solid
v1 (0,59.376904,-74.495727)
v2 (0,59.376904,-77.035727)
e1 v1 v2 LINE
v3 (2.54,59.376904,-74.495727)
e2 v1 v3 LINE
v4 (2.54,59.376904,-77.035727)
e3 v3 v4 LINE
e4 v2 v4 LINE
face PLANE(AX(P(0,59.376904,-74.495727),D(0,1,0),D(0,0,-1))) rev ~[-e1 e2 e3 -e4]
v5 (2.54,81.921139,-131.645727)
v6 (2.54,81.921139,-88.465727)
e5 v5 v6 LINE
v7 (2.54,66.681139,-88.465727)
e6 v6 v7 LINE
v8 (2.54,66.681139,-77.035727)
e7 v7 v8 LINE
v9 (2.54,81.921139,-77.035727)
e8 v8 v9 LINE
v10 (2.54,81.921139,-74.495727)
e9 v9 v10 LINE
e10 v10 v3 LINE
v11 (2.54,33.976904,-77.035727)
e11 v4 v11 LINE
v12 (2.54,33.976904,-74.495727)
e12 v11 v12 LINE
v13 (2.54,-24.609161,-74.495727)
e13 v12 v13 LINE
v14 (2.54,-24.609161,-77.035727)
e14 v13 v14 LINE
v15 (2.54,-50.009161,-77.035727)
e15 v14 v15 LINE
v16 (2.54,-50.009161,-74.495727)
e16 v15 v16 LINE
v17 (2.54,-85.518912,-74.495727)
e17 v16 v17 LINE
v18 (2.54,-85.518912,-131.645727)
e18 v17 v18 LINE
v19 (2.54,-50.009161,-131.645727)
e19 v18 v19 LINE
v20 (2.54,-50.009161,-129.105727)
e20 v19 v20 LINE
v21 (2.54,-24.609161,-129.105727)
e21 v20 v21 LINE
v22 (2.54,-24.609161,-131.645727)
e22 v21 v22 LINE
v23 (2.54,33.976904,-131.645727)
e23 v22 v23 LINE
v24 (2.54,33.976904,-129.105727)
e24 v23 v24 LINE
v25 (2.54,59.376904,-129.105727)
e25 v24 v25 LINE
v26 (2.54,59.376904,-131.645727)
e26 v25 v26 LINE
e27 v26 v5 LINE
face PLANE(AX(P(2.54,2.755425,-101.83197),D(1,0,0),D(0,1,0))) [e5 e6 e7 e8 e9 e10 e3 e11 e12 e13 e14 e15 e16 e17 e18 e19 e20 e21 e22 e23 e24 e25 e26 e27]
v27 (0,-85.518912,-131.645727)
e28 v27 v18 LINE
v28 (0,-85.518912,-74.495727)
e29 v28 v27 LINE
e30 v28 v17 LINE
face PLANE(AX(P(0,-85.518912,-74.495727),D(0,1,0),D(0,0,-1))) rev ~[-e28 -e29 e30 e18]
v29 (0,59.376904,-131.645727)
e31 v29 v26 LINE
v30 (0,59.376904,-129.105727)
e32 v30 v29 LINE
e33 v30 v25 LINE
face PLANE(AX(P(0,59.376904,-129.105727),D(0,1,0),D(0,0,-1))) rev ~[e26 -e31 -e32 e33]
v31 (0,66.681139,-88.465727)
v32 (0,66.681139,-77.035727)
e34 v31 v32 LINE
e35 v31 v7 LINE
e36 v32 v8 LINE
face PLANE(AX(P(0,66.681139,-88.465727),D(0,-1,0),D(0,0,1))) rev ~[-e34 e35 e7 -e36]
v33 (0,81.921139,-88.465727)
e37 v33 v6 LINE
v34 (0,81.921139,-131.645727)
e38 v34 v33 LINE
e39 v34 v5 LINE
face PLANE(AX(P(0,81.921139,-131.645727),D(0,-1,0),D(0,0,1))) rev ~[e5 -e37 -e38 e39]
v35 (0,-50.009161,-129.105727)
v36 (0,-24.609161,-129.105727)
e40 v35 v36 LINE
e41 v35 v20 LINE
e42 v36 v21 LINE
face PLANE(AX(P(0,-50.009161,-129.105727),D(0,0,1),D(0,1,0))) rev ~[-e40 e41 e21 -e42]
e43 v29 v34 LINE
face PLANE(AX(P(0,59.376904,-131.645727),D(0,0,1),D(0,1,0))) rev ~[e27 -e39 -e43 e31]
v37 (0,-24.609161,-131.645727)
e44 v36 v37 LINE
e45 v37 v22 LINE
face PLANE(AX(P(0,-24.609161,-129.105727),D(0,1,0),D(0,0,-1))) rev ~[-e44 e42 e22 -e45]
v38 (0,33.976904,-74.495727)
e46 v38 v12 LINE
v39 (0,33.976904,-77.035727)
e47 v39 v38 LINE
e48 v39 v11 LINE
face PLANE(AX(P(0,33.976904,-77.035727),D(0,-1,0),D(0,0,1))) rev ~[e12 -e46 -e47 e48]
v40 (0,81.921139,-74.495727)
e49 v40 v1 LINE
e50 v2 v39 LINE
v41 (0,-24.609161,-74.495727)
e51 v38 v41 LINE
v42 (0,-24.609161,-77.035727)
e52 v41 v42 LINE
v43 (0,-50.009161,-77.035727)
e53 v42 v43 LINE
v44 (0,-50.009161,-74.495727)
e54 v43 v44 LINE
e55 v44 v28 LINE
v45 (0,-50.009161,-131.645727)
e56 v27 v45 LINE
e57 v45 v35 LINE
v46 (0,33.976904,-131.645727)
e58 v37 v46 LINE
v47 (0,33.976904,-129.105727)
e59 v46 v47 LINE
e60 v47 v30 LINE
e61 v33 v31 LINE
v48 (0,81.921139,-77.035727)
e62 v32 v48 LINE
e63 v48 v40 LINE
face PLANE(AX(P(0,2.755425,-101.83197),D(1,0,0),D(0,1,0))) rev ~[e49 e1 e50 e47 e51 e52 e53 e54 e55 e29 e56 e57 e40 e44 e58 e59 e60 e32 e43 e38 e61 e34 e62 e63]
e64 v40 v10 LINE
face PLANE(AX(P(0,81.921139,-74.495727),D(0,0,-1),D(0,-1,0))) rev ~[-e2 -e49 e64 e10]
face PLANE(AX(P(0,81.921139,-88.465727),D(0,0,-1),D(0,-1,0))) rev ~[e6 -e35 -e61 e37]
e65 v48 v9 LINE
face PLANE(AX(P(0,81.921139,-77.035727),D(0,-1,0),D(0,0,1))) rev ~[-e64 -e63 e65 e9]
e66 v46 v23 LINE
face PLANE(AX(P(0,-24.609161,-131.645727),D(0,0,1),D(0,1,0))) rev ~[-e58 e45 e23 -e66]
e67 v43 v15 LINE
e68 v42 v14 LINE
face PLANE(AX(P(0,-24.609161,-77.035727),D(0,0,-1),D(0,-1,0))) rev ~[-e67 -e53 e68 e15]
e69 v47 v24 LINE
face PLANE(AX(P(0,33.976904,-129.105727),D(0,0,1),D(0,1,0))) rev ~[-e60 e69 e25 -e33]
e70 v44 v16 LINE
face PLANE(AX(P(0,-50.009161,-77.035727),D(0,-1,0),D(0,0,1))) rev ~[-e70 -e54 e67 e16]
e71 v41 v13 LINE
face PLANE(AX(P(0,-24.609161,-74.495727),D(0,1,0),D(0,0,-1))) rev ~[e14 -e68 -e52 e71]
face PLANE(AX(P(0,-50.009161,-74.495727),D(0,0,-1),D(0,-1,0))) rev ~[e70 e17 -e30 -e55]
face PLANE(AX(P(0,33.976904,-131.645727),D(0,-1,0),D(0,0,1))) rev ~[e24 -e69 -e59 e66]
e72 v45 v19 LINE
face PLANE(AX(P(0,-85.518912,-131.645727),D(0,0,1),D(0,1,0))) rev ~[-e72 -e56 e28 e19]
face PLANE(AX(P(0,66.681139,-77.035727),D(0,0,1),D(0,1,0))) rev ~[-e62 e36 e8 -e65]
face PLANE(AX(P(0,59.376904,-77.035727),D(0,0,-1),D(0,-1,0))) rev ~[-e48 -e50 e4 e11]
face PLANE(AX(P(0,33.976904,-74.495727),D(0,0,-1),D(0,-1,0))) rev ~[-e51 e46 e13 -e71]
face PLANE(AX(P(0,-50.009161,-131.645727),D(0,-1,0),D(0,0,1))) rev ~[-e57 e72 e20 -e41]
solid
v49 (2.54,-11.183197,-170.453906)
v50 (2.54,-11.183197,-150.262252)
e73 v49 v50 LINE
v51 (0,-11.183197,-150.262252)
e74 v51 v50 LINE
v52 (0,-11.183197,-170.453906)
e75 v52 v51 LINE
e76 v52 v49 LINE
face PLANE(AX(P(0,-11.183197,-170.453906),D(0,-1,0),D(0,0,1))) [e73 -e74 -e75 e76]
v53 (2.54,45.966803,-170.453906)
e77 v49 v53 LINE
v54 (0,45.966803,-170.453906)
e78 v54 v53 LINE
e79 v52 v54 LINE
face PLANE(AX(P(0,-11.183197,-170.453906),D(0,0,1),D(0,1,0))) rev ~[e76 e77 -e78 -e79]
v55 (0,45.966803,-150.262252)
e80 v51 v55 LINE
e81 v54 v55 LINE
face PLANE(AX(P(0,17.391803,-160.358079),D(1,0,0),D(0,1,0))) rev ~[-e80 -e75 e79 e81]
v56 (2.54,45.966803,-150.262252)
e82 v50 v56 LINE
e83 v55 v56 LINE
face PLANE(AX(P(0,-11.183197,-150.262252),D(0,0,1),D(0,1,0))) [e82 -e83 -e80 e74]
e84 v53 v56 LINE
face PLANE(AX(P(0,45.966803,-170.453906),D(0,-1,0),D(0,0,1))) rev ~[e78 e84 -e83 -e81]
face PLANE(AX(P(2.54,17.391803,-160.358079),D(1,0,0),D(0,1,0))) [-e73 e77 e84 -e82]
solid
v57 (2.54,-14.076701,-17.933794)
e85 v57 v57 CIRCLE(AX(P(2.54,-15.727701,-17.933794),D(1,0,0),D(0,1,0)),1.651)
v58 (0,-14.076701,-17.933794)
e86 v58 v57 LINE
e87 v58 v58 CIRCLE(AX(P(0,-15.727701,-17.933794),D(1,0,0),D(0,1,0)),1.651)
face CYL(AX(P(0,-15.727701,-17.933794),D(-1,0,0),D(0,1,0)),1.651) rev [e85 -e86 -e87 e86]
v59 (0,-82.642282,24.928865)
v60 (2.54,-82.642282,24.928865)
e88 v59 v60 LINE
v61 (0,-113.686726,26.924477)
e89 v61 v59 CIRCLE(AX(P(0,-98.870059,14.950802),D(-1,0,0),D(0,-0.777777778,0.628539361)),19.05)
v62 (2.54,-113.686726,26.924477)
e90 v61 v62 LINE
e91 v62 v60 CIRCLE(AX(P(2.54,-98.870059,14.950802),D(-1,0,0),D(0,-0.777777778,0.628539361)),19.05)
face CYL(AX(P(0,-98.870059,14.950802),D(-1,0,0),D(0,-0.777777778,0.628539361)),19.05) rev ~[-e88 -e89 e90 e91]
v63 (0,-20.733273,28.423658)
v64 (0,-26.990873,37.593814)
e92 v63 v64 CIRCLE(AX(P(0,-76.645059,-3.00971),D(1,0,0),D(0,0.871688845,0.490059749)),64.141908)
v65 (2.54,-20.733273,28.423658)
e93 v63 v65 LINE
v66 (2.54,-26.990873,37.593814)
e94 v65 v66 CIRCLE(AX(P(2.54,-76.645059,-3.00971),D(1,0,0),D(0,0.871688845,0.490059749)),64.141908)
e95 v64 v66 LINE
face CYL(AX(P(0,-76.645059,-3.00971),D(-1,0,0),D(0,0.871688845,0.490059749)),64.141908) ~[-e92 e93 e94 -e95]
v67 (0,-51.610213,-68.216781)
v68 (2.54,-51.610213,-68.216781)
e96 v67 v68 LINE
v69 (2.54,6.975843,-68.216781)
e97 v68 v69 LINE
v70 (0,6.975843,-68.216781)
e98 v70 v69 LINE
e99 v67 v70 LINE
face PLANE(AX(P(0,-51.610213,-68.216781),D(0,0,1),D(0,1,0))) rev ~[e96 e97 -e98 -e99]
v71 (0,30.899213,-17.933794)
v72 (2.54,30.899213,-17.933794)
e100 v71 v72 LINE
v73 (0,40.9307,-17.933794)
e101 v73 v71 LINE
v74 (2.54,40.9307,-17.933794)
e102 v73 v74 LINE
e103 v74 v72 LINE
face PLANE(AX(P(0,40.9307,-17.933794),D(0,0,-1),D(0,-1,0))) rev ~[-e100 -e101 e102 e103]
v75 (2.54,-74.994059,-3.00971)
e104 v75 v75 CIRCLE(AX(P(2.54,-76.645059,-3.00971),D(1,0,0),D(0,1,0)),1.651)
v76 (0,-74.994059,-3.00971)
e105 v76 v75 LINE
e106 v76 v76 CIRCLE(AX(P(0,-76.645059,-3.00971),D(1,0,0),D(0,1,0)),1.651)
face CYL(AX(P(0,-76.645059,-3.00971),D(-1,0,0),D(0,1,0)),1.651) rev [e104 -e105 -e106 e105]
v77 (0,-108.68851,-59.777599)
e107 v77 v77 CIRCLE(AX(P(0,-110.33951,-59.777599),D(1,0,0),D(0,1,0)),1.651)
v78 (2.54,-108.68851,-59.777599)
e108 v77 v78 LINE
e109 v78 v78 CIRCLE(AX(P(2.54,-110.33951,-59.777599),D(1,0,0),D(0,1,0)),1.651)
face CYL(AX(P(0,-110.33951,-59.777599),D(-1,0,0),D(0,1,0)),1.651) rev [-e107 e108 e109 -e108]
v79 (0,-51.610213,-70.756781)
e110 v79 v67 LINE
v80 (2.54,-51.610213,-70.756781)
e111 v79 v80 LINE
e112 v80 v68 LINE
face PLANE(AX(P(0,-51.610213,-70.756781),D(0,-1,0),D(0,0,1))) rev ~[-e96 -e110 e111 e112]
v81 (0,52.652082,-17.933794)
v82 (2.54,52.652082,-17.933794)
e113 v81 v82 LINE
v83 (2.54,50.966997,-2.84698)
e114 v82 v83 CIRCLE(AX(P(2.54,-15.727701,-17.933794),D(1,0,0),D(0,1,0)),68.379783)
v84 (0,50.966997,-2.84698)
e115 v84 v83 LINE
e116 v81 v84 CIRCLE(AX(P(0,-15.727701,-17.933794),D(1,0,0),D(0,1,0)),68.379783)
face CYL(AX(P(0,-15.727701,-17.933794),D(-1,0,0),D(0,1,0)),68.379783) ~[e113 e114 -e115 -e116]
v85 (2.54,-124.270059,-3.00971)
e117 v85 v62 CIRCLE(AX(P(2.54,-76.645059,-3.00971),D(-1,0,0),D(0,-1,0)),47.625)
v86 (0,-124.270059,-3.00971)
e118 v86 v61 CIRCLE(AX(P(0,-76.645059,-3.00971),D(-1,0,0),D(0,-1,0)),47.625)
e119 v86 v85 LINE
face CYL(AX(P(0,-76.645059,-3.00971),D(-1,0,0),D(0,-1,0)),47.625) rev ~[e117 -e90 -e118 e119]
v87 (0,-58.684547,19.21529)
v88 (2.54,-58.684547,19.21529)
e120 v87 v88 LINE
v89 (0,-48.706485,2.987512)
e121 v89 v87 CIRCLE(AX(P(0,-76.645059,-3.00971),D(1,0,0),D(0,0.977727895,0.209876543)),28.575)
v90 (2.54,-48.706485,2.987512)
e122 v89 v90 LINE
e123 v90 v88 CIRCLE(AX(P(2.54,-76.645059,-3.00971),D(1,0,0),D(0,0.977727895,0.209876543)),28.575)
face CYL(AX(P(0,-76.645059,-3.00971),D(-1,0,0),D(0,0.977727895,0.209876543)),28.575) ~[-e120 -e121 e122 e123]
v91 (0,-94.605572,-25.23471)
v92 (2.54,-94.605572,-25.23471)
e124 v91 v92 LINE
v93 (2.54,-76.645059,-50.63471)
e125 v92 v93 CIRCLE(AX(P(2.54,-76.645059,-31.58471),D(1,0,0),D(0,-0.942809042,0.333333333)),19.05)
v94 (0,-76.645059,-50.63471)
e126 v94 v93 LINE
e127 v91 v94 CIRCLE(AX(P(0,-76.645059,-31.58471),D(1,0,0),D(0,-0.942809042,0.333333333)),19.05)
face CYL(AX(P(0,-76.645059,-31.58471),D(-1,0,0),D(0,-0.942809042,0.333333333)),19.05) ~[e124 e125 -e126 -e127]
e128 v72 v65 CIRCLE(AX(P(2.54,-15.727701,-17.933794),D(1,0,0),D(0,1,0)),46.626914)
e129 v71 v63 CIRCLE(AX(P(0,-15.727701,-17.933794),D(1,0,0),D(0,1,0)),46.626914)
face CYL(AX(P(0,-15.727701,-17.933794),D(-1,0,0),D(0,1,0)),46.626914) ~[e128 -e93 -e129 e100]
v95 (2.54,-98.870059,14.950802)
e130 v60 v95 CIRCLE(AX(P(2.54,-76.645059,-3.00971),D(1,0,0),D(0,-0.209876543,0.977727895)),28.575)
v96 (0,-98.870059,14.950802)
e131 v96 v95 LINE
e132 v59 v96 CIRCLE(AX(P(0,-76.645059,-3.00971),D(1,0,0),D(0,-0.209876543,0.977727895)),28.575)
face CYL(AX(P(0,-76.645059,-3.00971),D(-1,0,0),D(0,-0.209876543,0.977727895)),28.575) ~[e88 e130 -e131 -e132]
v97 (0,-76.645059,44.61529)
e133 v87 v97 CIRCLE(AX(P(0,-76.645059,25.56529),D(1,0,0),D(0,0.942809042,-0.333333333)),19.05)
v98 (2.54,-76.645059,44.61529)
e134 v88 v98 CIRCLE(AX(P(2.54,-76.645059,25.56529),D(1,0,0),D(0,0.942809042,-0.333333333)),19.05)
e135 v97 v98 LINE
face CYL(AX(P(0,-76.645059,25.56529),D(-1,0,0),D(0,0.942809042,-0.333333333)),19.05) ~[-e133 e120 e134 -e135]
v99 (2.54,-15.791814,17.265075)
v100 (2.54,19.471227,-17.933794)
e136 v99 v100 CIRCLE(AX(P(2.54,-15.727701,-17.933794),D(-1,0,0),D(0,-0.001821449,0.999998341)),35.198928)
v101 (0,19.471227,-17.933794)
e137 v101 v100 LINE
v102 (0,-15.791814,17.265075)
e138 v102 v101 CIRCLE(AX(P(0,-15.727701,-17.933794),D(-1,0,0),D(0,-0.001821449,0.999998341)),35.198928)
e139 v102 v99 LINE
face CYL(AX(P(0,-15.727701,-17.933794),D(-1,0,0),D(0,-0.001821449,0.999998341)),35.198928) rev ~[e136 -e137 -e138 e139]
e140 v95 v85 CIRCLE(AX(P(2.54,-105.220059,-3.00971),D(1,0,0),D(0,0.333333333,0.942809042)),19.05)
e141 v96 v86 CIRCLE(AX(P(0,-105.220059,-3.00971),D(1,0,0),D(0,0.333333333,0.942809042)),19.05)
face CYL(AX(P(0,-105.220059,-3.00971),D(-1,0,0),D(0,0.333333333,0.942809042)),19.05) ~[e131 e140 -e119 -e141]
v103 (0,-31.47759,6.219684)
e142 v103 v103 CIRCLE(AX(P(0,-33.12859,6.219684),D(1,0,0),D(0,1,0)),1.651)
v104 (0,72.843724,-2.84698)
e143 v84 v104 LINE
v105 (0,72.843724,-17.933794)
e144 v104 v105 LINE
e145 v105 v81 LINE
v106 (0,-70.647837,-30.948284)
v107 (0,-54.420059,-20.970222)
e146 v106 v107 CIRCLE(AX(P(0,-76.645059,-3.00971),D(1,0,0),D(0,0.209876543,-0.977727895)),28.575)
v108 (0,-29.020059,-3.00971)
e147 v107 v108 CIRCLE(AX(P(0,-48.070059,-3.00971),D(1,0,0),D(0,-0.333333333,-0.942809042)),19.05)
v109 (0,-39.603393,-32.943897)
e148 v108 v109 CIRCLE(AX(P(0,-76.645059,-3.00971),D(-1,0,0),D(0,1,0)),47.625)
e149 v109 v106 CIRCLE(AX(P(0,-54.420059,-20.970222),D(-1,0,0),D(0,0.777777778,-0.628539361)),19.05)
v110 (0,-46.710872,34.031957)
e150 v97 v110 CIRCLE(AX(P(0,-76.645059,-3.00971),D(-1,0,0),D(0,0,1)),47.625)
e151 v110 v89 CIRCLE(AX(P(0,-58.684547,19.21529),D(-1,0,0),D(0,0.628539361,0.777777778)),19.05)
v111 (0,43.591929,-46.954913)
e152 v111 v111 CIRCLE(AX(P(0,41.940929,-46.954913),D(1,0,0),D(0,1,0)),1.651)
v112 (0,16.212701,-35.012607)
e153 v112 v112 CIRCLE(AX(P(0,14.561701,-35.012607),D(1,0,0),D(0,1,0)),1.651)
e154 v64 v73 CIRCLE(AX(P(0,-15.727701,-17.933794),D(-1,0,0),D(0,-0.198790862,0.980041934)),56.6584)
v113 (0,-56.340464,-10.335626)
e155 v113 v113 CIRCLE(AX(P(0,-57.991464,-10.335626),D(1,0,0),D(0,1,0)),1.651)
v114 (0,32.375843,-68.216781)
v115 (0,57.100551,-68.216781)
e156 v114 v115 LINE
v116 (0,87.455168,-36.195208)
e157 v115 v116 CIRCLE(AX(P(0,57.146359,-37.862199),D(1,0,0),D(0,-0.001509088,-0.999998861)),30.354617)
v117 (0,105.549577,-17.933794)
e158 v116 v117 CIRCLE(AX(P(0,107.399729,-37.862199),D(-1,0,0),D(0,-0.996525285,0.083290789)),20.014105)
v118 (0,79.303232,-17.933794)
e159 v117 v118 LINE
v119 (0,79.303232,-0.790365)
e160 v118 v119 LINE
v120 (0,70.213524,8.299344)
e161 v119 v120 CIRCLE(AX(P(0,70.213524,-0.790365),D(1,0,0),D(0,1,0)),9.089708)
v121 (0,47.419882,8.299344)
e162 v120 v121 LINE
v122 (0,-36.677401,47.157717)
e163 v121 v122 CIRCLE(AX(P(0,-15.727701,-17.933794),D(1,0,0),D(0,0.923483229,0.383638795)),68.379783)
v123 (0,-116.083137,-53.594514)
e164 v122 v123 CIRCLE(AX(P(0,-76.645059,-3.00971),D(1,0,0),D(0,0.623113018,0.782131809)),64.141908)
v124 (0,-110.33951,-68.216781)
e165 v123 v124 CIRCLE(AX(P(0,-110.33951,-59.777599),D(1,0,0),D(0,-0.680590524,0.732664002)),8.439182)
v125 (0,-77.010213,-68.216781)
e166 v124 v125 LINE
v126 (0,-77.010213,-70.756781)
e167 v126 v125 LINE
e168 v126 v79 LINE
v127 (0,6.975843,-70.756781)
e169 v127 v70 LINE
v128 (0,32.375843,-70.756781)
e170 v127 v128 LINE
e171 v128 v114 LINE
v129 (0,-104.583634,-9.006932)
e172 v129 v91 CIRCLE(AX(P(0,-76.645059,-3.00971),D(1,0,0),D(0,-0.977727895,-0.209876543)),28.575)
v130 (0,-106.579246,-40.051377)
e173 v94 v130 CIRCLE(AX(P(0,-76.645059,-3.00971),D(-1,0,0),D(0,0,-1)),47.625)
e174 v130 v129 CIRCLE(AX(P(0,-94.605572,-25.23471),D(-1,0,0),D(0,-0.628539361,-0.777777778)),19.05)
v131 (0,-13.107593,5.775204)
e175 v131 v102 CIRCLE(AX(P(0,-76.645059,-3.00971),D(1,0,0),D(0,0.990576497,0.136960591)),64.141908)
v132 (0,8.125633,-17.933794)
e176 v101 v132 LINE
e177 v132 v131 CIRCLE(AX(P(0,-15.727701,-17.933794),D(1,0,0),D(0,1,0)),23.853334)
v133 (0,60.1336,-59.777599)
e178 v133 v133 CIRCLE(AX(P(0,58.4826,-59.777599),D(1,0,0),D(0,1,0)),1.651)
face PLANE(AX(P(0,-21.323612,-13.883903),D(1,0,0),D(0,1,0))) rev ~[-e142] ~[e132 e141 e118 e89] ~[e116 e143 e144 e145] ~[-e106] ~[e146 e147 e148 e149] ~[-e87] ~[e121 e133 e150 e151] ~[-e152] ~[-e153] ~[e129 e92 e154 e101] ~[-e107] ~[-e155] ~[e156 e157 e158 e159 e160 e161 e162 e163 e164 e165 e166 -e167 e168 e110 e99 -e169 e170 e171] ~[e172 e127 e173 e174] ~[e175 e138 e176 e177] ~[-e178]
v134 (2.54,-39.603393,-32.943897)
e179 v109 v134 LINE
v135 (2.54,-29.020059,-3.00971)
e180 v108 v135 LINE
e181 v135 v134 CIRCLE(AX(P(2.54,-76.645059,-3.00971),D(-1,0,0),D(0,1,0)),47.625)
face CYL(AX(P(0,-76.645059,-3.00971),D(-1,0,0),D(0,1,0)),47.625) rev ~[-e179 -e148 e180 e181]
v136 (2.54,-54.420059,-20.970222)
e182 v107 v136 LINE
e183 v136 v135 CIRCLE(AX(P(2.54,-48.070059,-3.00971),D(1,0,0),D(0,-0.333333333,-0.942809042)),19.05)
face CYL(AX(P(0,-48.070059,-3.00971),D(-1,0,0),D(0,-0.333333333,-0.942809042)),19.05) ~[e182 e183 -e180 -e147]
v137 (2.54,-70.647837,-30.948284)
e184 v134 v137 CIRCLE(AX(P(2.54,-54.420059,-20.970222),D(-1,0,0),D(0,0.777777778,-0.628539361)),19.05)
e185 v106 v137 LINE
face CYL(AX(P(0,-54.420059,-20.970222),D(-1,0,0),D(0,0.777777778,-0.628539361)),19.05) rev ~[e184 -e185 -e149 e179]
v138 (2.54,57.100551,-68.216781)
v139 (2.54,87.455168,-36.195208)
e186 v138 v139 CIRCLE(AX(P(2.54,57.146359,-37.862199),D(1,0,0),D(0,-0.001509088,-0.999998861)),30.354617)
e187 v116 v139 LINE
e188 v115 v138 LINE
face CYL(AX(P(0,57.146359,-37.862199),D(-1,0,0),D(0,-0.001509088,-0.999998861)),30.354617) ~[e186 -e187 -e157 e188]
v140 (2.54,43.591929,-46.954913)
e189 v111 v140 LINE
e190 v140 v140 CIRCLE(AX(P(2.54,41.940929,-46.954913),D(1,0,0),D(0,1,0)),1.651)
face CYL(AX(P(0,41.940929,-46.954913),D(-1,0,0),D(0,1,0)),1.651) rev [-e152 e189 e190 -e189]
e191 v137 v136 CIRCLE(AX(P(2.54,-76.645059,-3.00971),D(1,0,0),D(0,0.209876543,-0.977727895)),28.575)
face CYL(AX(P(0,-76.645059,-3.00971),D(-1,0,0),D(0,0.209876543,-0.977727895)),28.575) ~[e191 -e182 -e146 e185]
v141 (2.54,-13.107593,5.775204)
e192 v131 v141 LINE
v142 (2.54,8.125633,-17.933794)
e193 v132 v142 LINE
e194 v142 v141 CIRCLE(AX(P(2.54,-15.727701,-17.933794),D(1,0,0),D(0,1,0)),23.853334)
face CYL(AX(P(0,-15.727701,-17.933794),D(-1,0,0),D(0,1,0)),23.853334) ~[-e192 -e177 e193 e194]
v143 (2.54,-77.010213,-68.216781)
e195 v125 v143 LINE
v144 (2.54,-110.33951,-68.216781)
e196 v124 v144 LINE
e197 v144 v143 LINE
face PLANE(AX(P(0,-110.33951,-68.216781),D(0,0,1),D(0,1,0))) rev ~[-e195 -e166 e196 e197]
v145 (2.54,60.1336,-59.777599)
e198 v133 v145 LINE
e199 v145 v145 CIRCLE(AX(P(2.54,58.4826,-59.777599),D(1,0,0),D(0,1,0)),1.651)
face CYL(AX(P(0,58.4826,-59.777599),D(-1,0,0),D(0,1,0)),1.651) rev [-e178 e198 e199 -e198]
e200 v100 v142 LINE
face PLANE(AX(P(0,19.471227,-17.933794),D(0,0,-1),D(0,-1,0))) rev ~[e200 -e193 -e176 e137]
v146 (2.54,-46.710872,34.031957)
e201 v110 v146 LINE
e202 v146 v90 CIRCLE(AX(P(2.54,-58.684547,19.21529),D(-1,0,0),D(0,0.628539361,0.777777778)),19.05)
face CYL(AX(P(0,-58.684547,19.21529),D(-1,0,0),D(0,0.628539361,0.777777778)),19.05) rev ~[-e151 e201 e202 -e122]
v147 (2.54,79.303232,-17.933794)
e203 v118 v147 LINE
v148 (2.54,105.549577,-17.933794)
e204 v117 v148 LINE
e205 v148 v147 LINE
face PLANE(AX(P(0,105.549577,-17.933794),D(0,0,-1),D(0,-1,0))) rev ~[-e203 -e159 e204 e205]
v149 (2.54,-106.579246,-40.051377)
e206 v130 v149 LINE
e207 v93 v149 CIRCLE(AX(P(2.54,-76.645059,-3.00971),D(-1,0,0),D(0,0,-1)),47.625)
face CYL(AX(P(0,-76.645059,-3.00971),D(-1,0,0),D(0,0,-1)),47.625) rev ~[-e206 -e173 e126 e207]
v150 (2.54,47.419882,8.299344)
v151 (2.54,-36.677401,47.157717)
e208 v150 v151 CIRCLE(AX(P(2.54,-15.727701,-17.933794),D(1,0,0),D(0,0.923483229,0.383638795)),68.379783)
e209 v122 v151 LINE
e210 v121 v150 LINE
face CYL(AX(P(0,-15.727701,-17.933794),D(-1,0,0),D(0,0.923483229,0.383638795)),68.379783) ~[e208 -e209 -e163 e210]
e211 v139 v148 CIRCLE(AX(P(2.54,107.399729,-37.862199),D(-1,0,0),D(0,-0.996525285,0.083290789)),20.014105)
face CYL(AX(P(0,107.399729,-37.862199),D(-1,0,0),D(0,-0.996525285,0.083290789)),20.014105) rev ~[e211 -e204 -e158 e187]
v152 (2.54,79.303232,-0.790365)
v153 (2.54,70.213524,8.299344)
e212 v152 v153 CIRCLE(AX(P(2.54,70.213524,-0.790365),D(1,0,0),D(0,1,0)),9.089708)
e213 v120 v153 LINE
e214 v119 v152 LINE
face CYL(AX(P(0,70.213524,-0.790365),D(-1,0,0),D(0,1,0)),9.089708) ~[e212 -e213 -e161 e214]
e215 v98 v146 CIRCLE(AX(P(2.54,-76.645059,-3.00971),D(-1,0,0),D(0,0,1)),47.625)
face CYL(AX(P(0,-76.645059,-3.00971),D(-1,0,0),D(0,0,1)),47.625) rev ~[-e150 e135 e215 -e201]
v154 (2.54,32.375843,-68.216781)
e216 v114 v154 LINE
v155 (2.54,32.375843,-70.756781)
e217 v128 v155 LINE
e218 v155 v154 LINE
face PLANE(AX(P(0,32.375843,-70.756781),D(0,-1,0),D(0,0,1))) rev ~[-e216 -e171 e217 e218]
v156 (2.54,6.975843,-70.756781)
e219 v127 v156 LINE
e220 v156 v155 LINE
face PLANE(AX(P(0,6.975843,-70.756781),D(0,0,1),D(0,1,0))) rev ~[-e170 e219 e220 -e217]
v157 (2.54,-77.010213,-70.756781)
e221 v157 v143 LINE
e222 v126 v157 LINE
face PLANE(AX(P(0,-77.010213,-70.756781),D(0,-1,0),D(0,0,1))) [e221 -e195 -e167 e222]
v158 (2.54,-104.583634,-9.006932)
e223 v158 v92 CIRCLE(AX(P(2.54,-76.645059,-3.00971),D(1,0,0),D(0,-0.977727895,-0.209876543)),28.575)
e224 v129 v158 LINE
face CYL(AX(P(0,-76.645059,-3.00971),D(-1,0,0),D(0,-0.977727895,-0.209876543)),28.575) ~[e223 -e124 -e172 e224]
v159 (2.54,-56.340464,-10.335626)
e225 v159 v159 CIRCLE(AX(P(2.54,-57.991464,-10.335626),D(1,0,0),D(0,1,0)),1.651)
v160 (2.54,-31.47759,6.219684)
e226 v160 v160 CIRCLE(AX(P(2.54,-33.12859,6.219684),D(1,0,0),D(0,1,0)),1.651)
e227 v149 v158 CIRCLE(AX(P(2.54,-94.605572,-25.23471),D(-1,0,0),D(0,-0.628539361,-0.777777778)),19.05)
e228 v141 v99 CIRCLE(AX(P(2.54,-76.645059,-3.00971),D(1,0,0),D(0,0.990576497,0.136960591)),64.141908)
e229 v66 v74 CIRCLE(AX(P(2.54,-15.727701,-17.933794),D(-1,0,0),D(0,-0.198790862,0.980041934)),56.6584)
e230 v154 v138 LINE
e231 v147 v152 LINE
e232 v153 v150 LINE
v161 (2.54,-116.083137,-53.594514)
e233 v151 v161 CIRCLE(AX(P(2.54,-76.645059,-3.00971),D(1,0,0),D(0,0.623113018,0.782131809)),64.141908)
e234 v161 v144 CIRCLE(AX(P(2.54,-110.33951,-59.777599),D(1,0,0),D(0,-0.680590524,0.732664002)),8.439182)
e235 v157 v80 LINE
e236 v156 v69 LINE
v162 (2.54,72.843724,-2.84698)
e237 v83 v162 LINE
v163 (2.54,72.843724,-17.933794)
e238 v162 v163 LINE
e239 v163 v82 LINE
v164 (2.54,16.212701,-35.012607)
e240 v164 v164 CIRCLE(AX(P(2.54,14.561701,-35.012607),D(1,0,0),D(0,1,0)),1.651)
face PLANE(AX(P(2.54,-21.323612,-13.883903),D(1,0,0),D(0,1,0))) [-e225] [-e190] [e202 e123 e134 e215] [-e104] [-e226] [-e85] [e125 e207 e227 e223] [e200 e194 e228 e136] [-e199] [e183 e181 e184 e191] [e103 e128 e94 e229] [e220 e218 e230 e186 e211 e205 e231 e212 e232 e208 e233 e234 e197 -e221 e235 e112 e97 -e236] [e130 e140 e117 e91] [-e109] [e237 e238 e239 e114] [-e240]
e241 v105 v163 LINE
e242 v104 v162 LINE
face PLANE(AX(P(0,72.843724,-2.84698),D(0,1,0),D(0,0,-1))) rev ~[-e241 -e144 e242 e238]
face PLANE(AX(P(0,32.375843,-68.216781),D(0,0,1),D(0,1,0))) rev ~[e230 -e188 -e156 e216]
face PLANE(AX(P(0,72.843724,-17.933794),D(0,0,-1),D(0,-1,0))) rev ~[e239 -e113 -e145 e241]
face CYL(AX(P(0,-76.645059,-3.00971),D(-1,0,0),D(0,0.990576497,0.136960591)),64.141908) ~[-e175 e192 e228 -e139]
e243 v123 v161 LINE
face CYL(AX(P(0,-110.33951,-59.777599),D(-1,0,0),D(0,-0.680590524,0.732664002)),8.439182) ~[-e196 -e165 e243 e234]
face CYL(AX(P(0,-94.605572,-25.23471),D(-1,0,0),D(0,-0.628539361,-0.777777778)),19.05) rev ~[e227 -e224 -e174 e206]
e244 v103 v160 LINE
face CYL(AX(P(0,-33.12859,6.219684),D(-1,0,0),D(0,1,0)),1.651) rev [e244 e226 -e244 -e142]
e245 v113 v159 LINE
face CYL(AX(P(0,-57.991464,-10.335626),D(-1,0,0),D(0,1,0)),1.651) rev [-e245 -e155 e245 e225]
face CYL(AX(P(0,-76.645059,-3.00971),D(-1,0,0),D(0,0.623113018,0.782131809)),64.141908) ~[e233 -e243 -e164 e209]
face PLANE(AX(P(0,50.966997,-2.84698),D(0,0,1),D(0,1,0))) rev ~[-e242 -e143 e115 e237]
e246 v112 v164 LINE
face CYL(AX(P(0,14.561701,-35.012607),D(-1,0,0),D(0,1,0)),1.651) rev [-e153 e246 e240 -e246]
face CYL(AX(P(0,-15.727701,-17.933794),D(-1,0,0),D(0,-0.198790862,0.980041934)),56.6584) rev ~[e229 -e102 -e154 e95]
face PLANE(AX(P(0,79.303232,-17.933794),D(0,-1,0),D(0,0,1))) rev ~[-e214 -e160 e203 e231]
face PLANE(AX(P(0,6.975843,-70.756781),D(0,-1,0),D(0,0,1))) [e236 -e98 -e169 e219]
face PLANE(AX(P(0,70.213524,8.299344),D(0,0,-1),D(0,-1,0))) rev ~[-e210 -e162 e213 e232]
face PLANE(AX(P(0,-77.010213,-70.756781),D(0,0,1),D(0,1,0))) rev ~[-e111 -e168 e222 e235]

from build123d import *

# Parameters (mm, degrees)
F0_R     = 1.651
F0_W     = 25.4
F0_H     = 2.54
F1_DEPTH = 2.54
F3_DEPTH = 2.54
F2_W     = 57.15
F2_H     = 20.1916538


# Not quite as in the source:
# - a feature names something its author has since deleted; it is built from what else it names


with BuildPart() as f1:
    # F0 (on Right) → F1 (new body)
    with BuildSketch(Plane.YZ):
        with BuildLine():
            Line((-110.3395098078, -68.216781003), (-77.0102134189, -68.216781003))
            Line((-77.0102134189, -68.216781003), (-51.6102134189, -68.216781003))
            Line((-51.6102134189, -68.216781003), (6.9758426398, -68.216781003))
            Line((6.9758426398, -68.216781003), (32.3758426398, -68.216781003))
            Line((32.3758426398, -68.216781003), (57.100551478, -68.216781003))
            ThreePointArc((57.100551478, -68.216781003), (79.1760571871, -58.7450905637), (87.4551682283, -36.1952082478))
            ThreePointArc((87.4551682283, -36.1952082478), (93.1827609105, -23.7752479136), (105.5495773538, -17.933794011))
            Line((105.5495773538, -17.933794011), (79.3032324412, -17.933794011))
            Line((79.3032324412, -17.933794011), (79.3032324412, -0.7903648026))
            ThreePointArc((79.3032324412, -0.7903648026), (76.6409185109, 5.6370295953), (70.2135241129, 8.2993435257))
            Line((70.2135241129, 8.2993435257), (47.4198818769, 8.2993435257))
            ThreePointArc((47.4198818769, 8.2993435257), (12.9543250307, 44.1398405436), (-36.6774012974, 47.1577167678))
            ThreePointArc((-36.6774012974, 47.1577167678), (-127.0218705021, 36.6937065388), (-116.0831372229, -53.5945138457))
            ThreePointArc((-116.0831372229, -53.5945138457), (-118.1944438098, -62.8630173745), (-110.3395098078, -68.216781003))
        make_face()
        with Locations((-110.3395098078, -59.7775988281)):
            Circle(F0_R, mode=Mode.SUBTRACT)
        with BuildLine():
            ThreePointArc((-106.5792463676, -40.0513765479), (-113.6163335987, -24.0126518115), (-104.5836338962, -9.0069321035))
            ThreePointArc((-104.5836338962, -9.0069321035), (-100.986725964, -17.9768034164), (-94.6055715395, -25.2347098813))
            ThreePointArc((-94.6055715395, -25.2347098813), (-92.199319164, -42.5832325093), (-76.6450592973, -50.6347098813))
            ThreePointArc((-76.6450592973, -50.6347098813), (-92.5200592973, -47.9109904866), (-106.5792463676, -40.0513765479))
        make_face(mode=Mode.SUBTRACT)
        with BuildLine():
            ThreePointArc((-70.6478370751, -30.9482844801), (-61.6779657622, -27.3513765479), (-54.4200592973, -20.9702221234))
            ThreePointArc((-54.4200592973, -20.9702221234), (-37.0715366693, -18.5639697479), (-29.0200592973, -3.0097098813))
            ThreePointArc((-29.0200592973, -3.0097098813), (-31.743778692, -18.8847098813), (-39.6033926307, -32.9438969515))
            ThreePointArc((-39.6033926307, -32.9438969515), (-55.6421173671, -39.9809841827), (-70.6478370751, -30.9482844801))
        make_face(mode=Mode.SUBTRACT)
        with Locations((-57.9914643632, -10.3356258236)):
            Circle(F0_R, mode=Mode.SUBTRACT)
        with Locations((41.94092891, -46.9549127524)):
            Circle(F0_R, mode=Mode.SUBTRACT)
        with Locations((58.4825998644, -59.7775988281)):
            Circle(F0_R, mode=Mode.SUBTRACT)
        with Locations((14.561701, -35.0126066428)):
            Circle(F0_R, mode=Mode.SUBTRACT)
        with Locations((-15.7277009394, -17.933794011)):
            Circle(F0_R, mode=Mode.SUBTRACT)
        with BuildLine():
            Line((72.8437239482, -17.933794011), (52.6520820419, -17.933794011))
            ThreePointArc((52.6520820419, -17.933794011), (52.2295051274, -10.343480173), (50.9669973093, -2.8469803618))
            Line((50.9669973093, -2.8469803618), (72.8437239482, -2.8469803618))
            Line((72.8437239482, -2.8469803618), (72.8437239482, -17.933794011))
        make_face(mode=Mode.SUBTRACT)
        with BuildLine():
            ThreePointArc((-124.2700592973, -3.0097098813), (-121.5463399027, 12.8652901187), (-113.686725964, 26.924477189))
            ThreePointArc((-113.686725964, 26.924477189), (-97.6480012275, 33.9615644202), (-82.6422815195, 24.9288647176))
            ThreePointArc((-82.6422815195, 24.9288647176), (-91.6121528324, 21.3319567854), (-98.8700592973, 14.9508023609))
            ThreePointArc((-98.8700592973, 14.9508023609), (-116.2185819254, 12.5445499854), (-124.2700592973, -3.0097098813))
        make_face(mode=Mode.SUBTRACT)
        with Locations((-76.6450592973, -3.0097098813)):
            Circle(F0_R, mode=Mode.SUBTRACT)
        with Locations((-33.1285902436, 6.2196841001)):
            Circle(F0_R, mode=Mode.SUBTRACT)
        with BuildLine():
            ThreePointArc((-46.7108722271, 34.0319567854), (-39.6737849959, 17.993232049), (-48.7064846984, 2.987512341))
            ThreePointArc((-48.7064846984, 2.987512341), (-52.3033926307, 11.9573836539), (-58.6845470552, 19.2152901187))
            ThreePointArc((-58.6845470552, 19.2152901187), (-61.0907994306, 36.5638127468), (-76.6450592973, 44.6152901187))
            ThreePointArc((-76.6450592973, 44.6152901187), (-60.7700592973, 41.8915707241), (-46.7108722271, 34.0319567854))
        make_face(mode=Mode.SUBTRACT)
        with BuildLine():
            ThreePointArc((8.1256330932, -17.933794011), (2.0413714041, -2.0202270784), (-13.1075925996, 5.7752037906))
            ThreePointArc((-13.1075925996, 5.7752037906), (-14.1849392561, 11.581992796), (-15.7918139924, 17.2650754062))
            ThreePointArc((-15.7918139924, 17.2650754062), (9.1390218846, 6.9782636063), (19.4712268672, -17.933794011))
            Line((19.4712268672, -17.933794011), (8.1256330932, -17.933794011))
        make_face(mode=Mode.SUBTRACT)
        with BuildLine():
            ThreePointArc((-26.9908731892, 37.5938144058), (20.1332877639, 25.9314979047), (40.9306995465, -17.933794011))
            Line((40.9306995465, -17.933794011), (30.8992126275, -17.933794011))
            ThreePointArc((30.8992126275, -17.933794011), (15.4225371964, 16.7610432542), (-20.7332734529, 28.4236575215))
            ThreePointArc((-20.7332734529, 28.4236575215), (-23.6633025042, 33.1443746694), (-26.9908731892, 37.5938144058))
        make_face(mode=Mode.SUBTRACT)
        with Locations((-64.3102134189, -69.486781003)):
            Rectangle(F0_W, F0_H)
        with Locations((19.6758426398, -69.486781003)):
            Rectangle(F0_W, F0_H)
    extrude(amount=F1_DEPTH)


with BuildPart() as f3:
    # F2 (on Right) → F3 (new body)
    with BuildSketch(Plane.YZ):
        Polygon((-50.0091612339, -74.4957265361), (-85.5189124058, -74.4957265361), (-85.5189124058, -131.6457265361), (-50.0091612339, -131.6457265361), (-50.0091612339, -129.1057265361), (-24.6091612339, -129.1057265361), (-24.6091612339, -131.6457265361), (33.9769039661, -131.6457265361), (33.9769039661, -129.1057265361), (59.3769039661, -129.1057265361), (59.3769039661, -131.6457265361), (81.9211387942, -131.6457265361), (81.9211387942, -88.4657265361), (66.6811387942, -88.4657265361), (66.6811387942, -77.0357265361), (81.9211387942, -77.0357265361), (81.9211387942, -74.4957265361), (59.3769039661, -74.4957265361), (59.3769039661, -77.0357265361), (33.9769039661, -77.0357265361), (33.9769039661, -74.4957265361), (-24.6091612339, -74.4957265361), (-24.6091612339, -77.0357265361), (-50.0091612339, -77.0357265361), align=None)
    extrude(amount=F3_DEPTH)


with BuildPart() as f3b:
    # F2 (on Right) → F3, piece 2 (new body)
    with BuildSketch(Plane.YZ):
        with Locations((17.3918033212, -160.3580791593)):
            Rectangle(F2_W, F2_H)
    extrude(amount=F3_DEPTH)


solid = Compound([f1.part, f3.part, f3b.part])
